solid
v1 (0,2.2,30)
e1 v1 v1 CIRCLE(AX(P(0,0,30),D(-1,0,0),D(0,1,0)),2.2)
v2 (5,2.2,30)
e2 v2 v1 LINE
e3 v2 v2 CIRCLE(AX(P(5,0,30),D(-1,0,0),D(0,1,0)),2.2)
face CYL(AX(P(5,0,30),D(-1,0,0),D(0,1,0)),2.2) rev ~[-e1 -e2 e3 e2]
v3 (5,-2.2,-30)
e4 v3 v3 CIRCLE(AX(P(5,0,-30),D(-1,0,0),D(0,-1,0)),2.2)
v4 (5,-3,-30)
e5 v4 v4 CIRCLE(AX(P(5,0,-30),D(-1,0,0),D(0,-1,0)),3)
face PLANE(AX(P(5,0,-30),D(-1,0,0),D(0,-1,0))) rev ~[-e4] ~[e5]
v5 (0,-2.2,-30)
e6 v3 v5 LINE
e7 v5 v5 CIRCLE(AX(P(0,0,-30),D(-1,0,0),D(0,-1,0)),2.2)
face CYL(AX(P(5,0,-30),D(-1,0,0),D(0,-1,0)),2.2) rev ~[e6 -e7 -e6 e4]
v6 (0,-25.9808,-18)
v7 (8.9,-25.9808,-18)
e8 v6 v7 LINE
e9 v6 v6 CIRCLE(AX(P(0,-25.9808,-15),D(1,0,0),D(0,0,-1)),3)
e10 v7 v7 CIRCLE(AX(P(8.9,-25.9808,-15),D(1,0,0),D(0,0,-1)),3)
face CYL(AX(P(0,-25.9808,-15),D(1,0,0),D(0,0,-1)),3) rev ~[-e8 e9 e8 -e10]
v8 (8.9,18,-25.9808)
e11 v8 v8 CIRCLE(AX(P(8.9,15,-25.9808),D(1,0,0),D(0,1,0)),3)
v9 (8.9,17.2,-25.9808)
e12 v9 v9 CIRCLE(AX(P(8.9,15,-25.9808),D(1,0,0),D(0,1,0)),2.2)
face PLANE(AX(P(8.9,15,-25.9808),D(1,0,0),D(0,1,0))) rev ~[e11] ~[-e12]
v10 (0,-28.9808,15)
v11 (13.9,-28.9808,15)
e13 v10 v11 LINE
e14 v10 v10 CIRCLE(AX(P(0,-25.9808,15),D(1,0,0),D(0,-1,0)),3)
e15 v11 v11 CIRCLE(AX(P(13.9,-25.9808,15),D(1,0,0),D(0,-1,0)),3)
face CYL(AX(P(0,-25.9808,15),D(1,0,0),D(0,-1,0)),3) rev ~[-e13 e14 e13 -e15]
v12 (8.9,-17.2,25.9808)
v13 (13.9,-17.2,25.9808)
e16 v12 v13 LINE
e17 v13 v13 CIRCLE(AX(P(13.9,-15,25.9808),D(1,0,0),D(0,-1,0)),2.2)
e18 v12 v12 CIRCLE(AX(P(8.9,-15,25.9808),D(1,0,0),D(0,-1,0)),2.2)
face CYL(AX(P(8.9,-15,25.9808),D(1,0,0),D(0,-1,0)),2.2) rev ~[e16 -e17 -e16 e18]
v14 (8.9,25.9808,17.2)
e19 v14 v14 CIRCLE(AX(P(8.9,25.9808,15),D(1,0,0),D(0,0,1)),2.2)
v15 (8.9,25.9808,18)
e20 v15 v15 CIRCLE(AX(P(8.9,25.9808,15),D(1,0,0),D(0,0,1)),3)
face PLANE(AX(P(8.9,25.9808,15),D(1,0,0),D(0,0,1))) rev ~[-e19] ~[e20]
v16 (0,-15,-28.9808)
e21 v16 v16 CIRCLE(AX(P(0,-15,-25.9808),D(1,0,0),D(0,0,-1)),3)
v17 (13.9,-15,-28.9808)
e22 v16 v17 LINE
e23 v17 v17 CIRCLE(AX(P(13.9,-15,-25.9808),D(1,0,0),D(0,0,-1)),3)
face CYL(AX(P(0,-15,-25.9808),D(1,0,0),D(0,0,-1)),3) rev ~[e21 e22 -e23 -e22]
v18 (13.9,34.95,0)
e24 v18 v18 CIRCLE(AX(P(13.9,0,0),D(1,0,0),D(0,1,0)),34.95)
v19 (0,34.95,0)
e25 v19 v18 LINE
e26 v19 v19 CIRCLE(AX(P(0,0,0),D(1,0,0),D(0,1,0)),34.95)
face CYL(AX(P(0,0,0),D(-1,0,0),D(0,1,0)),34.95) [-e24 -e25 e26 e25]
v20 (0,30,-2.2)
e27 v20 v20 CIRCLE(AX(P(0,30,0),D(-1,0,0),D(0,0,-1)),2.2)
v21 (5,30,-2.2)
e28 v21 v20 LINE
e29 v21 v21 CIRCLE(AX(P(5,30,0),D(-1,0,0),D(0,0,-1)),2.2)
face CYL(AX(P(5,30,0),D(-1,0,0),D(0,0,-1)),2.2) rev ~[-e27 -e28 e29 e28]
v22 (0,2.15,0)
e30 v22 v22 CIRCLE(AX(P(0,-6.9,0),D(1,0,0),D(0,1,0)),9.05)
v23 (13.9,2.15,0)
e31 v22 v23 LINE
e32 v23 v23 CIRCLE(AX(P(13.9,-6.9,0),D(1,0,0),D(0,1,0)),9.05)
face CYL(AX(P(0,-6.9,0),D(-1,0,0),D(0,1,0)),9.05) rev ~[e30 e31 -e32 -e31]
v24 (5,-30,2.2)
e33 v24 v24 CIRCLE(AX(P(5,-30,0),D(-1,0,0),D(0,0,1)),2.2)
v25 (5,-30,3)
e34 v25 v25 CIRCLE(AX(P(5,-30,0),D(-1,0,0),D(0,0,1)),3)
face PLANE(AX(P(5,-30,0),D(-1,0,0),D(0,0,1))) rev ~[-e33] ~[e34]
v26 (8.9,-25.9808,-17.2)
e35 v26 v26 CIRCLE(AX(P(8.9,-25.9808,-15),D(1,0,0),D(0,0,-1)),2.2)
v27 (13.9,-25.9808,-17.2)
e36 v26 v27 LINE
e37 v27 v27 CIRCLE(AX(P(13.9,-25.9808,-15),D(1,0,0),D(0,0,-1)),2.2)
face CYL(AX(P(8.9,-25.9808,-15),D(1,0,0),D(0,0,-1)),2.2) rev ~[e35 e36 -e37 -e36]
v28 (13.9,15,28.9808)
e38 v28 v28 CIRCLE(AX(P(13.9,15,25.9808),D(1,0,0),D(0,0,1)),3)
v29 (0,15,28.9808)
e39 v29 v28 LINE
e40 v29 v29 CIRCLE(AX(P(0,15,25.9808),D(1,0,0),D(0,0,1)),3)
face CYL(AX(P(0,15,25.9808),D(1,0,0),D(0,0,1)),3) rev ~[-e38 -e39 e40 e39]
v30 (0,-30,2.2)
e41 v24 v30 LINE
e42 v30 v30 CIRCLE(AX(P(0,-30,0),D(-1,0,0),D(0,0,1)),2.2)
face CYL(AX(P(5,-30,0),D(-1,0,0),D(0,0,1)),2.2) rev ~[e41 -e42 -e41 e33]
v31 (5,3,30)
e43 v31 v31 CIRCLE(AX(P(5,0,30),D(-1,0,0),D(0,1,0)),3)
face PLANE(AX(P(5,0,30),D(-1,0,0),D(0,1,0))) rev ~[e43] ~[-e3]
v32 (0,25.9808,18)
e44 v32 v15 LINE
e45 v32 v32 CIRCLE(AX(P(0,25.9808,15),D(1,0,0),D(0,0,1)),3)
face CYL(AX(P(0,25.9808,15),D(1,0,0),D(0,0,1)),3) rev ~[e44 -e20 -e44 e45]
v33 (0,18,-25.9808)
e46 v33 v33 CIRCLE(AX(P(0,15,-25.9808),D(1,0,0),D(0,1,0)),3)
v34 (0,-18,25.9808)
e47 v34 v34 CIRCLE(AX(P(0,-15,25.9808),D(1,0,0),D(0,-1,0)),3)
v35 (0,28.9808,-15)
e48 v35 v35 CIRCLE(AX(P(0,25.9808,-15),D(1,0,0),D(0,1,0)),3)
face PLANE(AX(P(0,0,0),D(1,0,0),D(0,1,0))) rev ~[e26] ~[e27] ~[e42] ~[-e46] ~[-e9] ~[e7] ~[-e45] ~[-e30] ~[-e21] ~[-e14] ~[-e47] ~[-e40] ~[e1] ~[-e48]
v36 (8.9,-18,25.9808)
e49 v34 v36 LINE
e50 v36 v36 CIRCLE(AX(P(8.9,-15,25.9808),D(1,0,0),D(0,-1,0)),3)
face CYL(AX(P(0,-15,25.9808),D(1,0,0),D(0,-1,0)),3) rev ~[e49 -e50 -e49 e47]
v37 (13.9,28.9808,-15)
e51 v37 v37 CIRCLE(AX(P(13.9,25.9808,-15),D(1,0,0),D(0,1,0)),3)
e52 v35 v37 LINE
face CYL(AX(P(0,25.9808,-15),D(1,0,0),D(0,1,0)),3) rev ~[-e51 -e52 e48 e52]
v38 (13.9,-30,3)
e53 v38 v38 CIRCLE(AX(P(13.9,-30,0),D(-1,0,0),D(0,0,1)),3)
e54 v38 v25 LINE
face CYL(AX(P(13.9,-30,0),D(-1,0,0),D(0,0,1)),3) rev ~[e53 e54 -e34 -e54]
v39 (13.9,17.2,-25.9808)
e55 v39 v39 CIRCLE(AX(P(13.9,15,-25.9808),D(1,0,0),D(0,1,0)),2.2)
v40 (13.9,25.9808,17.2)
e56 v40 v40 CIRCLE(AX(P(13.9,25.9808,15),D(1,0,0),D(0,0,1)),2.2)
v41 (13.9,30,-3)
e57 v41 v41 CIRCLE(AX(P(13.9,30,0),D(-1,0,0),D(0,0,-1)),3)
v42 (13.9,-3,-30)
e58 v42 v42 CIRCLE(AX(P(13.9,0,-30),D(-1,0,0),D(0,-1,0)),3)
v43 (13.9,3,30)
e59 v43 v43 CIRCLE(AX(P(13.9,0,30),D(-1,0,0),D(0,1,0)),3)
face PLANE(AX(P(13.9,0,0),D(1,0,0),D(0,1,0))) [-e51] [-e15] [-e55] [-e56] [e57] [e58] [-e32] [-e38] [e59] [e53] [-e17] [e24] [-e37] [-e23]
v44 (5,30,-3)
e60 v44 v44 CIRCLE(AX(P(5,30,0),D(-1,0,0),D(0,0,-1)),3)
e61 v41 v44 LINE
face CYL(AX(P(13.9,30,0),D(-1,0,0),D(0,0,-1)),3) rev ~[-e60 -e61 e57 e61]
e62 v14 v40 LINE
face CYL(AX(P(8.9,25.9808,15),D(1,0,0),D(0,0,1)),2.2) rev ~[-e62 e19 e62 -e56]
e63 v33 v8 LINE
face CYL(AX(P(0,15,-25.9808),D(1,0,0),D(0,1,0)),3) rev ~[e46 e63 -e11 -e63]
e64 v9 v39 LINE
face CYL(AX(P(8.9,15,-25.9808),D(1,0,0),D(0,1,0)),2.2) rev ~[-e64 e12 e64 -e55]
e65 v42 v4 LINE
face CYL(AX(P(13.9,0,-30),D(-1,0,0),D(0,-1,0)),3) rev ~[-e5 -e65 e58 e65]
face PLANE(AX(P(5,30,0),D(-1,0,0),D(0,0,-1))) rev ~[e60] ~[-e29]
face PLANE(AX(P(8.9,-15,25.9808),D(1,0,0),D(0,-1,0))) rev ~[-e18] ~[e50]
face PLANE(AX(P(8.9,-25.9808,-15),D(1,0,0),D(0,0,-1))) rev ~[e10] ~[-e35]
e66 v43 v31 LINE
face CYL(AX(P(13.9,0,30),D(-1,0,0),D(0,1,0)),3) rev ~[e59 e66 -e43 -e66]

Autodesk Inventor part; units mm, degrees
ref_plane "YZ Plane" through (0, 0, 0) normal (1, 0, 0) x (0, 1, 0)
ref_plane "XZ Plane" through (0, 0, 0) normal (0, 1, 0) x (-1, 0, 0)
ref_plane "XY Plane" through (0, 0, 0) normal (0, 0, 1) x (1, 0, 0)
sketch "Sketch1" plane through (0, 0, 0) normal (1, 0, 0) x (0, 1, 0)
  circle A0 centre (0, 0) radius 34.95
  circle A1 centre (-6.9, 0) radius 9.05
  dimension "d0" = 69.9
  dimension "d1" = 18.1
  dimension "d2" = 6.9
extrude "Extrusion1" add sketch "Sketch1" along normal blind 13.9
sketch "Sketch2" plane through (13.9, 0, 0) normal (1, 0, 0) x (0, 0, -1)
  circle A0 centre (0, 0) radius 30
  point P0 (0, 30)
  dimension "d5" = 60
hole "Hole1" at (13.9, 30, 0) direction (-1, 0, 0) diameter 4.4 depth 13.9 counterbore diameter 6 counterbore depth 8.9
pattern_circular "Circular Pattern1" count 4 over 360 about axis through (0, 0, 0) along (1, 0, 0) of "Hole1"
sketch "Sketch4" plane through (0, 0, 0) normal (-1, 0, 0) x (0, 0, 1)
  circle A0 centre (0, 0) radius 30
  line L0 (0, 0) -> (25.9808, 15)
  line L1 (0, 0) -> (30, 0) construction
  dimension "d28" = 60
  dimension "d29" = 30
hole "Hole3" at (0, 15, 25.9808) direction (1, 0, 0) diameter 6 end through all
pattern_circular "Circular Pattern3" count 4 over 360 about axis through (0, 0, 0) along (1, 0, 0) of "Hole3"
sketch "Sketch5" plane through (0, 0, 0) normal (-1, 0, 0) x (0, 0, 1)
  circle A0 centre (0, 0) radius 30
  line L0 (0, 0) -> (15, 25.9808)
  line L1 (0, 0) -> (30, 0) construction
  point P0 (15, 25.9808)
  dimension "d40" = 60
  dimension "d41" = 60
hole "Hole4" at (0, 25.9808, 15) direction (1, 0, 0) diameter 4.4 depth 13.9 counterbore diameter 6 counterbore depth 8.9
pattern_circular "Circular Pattern4" count 4 over 360 about axis through (0, 0, 0) along (1, 0, 0) of "Hole4"
properties part number "sample-transfer_insulation" material "ABS Plastic light yellow"
